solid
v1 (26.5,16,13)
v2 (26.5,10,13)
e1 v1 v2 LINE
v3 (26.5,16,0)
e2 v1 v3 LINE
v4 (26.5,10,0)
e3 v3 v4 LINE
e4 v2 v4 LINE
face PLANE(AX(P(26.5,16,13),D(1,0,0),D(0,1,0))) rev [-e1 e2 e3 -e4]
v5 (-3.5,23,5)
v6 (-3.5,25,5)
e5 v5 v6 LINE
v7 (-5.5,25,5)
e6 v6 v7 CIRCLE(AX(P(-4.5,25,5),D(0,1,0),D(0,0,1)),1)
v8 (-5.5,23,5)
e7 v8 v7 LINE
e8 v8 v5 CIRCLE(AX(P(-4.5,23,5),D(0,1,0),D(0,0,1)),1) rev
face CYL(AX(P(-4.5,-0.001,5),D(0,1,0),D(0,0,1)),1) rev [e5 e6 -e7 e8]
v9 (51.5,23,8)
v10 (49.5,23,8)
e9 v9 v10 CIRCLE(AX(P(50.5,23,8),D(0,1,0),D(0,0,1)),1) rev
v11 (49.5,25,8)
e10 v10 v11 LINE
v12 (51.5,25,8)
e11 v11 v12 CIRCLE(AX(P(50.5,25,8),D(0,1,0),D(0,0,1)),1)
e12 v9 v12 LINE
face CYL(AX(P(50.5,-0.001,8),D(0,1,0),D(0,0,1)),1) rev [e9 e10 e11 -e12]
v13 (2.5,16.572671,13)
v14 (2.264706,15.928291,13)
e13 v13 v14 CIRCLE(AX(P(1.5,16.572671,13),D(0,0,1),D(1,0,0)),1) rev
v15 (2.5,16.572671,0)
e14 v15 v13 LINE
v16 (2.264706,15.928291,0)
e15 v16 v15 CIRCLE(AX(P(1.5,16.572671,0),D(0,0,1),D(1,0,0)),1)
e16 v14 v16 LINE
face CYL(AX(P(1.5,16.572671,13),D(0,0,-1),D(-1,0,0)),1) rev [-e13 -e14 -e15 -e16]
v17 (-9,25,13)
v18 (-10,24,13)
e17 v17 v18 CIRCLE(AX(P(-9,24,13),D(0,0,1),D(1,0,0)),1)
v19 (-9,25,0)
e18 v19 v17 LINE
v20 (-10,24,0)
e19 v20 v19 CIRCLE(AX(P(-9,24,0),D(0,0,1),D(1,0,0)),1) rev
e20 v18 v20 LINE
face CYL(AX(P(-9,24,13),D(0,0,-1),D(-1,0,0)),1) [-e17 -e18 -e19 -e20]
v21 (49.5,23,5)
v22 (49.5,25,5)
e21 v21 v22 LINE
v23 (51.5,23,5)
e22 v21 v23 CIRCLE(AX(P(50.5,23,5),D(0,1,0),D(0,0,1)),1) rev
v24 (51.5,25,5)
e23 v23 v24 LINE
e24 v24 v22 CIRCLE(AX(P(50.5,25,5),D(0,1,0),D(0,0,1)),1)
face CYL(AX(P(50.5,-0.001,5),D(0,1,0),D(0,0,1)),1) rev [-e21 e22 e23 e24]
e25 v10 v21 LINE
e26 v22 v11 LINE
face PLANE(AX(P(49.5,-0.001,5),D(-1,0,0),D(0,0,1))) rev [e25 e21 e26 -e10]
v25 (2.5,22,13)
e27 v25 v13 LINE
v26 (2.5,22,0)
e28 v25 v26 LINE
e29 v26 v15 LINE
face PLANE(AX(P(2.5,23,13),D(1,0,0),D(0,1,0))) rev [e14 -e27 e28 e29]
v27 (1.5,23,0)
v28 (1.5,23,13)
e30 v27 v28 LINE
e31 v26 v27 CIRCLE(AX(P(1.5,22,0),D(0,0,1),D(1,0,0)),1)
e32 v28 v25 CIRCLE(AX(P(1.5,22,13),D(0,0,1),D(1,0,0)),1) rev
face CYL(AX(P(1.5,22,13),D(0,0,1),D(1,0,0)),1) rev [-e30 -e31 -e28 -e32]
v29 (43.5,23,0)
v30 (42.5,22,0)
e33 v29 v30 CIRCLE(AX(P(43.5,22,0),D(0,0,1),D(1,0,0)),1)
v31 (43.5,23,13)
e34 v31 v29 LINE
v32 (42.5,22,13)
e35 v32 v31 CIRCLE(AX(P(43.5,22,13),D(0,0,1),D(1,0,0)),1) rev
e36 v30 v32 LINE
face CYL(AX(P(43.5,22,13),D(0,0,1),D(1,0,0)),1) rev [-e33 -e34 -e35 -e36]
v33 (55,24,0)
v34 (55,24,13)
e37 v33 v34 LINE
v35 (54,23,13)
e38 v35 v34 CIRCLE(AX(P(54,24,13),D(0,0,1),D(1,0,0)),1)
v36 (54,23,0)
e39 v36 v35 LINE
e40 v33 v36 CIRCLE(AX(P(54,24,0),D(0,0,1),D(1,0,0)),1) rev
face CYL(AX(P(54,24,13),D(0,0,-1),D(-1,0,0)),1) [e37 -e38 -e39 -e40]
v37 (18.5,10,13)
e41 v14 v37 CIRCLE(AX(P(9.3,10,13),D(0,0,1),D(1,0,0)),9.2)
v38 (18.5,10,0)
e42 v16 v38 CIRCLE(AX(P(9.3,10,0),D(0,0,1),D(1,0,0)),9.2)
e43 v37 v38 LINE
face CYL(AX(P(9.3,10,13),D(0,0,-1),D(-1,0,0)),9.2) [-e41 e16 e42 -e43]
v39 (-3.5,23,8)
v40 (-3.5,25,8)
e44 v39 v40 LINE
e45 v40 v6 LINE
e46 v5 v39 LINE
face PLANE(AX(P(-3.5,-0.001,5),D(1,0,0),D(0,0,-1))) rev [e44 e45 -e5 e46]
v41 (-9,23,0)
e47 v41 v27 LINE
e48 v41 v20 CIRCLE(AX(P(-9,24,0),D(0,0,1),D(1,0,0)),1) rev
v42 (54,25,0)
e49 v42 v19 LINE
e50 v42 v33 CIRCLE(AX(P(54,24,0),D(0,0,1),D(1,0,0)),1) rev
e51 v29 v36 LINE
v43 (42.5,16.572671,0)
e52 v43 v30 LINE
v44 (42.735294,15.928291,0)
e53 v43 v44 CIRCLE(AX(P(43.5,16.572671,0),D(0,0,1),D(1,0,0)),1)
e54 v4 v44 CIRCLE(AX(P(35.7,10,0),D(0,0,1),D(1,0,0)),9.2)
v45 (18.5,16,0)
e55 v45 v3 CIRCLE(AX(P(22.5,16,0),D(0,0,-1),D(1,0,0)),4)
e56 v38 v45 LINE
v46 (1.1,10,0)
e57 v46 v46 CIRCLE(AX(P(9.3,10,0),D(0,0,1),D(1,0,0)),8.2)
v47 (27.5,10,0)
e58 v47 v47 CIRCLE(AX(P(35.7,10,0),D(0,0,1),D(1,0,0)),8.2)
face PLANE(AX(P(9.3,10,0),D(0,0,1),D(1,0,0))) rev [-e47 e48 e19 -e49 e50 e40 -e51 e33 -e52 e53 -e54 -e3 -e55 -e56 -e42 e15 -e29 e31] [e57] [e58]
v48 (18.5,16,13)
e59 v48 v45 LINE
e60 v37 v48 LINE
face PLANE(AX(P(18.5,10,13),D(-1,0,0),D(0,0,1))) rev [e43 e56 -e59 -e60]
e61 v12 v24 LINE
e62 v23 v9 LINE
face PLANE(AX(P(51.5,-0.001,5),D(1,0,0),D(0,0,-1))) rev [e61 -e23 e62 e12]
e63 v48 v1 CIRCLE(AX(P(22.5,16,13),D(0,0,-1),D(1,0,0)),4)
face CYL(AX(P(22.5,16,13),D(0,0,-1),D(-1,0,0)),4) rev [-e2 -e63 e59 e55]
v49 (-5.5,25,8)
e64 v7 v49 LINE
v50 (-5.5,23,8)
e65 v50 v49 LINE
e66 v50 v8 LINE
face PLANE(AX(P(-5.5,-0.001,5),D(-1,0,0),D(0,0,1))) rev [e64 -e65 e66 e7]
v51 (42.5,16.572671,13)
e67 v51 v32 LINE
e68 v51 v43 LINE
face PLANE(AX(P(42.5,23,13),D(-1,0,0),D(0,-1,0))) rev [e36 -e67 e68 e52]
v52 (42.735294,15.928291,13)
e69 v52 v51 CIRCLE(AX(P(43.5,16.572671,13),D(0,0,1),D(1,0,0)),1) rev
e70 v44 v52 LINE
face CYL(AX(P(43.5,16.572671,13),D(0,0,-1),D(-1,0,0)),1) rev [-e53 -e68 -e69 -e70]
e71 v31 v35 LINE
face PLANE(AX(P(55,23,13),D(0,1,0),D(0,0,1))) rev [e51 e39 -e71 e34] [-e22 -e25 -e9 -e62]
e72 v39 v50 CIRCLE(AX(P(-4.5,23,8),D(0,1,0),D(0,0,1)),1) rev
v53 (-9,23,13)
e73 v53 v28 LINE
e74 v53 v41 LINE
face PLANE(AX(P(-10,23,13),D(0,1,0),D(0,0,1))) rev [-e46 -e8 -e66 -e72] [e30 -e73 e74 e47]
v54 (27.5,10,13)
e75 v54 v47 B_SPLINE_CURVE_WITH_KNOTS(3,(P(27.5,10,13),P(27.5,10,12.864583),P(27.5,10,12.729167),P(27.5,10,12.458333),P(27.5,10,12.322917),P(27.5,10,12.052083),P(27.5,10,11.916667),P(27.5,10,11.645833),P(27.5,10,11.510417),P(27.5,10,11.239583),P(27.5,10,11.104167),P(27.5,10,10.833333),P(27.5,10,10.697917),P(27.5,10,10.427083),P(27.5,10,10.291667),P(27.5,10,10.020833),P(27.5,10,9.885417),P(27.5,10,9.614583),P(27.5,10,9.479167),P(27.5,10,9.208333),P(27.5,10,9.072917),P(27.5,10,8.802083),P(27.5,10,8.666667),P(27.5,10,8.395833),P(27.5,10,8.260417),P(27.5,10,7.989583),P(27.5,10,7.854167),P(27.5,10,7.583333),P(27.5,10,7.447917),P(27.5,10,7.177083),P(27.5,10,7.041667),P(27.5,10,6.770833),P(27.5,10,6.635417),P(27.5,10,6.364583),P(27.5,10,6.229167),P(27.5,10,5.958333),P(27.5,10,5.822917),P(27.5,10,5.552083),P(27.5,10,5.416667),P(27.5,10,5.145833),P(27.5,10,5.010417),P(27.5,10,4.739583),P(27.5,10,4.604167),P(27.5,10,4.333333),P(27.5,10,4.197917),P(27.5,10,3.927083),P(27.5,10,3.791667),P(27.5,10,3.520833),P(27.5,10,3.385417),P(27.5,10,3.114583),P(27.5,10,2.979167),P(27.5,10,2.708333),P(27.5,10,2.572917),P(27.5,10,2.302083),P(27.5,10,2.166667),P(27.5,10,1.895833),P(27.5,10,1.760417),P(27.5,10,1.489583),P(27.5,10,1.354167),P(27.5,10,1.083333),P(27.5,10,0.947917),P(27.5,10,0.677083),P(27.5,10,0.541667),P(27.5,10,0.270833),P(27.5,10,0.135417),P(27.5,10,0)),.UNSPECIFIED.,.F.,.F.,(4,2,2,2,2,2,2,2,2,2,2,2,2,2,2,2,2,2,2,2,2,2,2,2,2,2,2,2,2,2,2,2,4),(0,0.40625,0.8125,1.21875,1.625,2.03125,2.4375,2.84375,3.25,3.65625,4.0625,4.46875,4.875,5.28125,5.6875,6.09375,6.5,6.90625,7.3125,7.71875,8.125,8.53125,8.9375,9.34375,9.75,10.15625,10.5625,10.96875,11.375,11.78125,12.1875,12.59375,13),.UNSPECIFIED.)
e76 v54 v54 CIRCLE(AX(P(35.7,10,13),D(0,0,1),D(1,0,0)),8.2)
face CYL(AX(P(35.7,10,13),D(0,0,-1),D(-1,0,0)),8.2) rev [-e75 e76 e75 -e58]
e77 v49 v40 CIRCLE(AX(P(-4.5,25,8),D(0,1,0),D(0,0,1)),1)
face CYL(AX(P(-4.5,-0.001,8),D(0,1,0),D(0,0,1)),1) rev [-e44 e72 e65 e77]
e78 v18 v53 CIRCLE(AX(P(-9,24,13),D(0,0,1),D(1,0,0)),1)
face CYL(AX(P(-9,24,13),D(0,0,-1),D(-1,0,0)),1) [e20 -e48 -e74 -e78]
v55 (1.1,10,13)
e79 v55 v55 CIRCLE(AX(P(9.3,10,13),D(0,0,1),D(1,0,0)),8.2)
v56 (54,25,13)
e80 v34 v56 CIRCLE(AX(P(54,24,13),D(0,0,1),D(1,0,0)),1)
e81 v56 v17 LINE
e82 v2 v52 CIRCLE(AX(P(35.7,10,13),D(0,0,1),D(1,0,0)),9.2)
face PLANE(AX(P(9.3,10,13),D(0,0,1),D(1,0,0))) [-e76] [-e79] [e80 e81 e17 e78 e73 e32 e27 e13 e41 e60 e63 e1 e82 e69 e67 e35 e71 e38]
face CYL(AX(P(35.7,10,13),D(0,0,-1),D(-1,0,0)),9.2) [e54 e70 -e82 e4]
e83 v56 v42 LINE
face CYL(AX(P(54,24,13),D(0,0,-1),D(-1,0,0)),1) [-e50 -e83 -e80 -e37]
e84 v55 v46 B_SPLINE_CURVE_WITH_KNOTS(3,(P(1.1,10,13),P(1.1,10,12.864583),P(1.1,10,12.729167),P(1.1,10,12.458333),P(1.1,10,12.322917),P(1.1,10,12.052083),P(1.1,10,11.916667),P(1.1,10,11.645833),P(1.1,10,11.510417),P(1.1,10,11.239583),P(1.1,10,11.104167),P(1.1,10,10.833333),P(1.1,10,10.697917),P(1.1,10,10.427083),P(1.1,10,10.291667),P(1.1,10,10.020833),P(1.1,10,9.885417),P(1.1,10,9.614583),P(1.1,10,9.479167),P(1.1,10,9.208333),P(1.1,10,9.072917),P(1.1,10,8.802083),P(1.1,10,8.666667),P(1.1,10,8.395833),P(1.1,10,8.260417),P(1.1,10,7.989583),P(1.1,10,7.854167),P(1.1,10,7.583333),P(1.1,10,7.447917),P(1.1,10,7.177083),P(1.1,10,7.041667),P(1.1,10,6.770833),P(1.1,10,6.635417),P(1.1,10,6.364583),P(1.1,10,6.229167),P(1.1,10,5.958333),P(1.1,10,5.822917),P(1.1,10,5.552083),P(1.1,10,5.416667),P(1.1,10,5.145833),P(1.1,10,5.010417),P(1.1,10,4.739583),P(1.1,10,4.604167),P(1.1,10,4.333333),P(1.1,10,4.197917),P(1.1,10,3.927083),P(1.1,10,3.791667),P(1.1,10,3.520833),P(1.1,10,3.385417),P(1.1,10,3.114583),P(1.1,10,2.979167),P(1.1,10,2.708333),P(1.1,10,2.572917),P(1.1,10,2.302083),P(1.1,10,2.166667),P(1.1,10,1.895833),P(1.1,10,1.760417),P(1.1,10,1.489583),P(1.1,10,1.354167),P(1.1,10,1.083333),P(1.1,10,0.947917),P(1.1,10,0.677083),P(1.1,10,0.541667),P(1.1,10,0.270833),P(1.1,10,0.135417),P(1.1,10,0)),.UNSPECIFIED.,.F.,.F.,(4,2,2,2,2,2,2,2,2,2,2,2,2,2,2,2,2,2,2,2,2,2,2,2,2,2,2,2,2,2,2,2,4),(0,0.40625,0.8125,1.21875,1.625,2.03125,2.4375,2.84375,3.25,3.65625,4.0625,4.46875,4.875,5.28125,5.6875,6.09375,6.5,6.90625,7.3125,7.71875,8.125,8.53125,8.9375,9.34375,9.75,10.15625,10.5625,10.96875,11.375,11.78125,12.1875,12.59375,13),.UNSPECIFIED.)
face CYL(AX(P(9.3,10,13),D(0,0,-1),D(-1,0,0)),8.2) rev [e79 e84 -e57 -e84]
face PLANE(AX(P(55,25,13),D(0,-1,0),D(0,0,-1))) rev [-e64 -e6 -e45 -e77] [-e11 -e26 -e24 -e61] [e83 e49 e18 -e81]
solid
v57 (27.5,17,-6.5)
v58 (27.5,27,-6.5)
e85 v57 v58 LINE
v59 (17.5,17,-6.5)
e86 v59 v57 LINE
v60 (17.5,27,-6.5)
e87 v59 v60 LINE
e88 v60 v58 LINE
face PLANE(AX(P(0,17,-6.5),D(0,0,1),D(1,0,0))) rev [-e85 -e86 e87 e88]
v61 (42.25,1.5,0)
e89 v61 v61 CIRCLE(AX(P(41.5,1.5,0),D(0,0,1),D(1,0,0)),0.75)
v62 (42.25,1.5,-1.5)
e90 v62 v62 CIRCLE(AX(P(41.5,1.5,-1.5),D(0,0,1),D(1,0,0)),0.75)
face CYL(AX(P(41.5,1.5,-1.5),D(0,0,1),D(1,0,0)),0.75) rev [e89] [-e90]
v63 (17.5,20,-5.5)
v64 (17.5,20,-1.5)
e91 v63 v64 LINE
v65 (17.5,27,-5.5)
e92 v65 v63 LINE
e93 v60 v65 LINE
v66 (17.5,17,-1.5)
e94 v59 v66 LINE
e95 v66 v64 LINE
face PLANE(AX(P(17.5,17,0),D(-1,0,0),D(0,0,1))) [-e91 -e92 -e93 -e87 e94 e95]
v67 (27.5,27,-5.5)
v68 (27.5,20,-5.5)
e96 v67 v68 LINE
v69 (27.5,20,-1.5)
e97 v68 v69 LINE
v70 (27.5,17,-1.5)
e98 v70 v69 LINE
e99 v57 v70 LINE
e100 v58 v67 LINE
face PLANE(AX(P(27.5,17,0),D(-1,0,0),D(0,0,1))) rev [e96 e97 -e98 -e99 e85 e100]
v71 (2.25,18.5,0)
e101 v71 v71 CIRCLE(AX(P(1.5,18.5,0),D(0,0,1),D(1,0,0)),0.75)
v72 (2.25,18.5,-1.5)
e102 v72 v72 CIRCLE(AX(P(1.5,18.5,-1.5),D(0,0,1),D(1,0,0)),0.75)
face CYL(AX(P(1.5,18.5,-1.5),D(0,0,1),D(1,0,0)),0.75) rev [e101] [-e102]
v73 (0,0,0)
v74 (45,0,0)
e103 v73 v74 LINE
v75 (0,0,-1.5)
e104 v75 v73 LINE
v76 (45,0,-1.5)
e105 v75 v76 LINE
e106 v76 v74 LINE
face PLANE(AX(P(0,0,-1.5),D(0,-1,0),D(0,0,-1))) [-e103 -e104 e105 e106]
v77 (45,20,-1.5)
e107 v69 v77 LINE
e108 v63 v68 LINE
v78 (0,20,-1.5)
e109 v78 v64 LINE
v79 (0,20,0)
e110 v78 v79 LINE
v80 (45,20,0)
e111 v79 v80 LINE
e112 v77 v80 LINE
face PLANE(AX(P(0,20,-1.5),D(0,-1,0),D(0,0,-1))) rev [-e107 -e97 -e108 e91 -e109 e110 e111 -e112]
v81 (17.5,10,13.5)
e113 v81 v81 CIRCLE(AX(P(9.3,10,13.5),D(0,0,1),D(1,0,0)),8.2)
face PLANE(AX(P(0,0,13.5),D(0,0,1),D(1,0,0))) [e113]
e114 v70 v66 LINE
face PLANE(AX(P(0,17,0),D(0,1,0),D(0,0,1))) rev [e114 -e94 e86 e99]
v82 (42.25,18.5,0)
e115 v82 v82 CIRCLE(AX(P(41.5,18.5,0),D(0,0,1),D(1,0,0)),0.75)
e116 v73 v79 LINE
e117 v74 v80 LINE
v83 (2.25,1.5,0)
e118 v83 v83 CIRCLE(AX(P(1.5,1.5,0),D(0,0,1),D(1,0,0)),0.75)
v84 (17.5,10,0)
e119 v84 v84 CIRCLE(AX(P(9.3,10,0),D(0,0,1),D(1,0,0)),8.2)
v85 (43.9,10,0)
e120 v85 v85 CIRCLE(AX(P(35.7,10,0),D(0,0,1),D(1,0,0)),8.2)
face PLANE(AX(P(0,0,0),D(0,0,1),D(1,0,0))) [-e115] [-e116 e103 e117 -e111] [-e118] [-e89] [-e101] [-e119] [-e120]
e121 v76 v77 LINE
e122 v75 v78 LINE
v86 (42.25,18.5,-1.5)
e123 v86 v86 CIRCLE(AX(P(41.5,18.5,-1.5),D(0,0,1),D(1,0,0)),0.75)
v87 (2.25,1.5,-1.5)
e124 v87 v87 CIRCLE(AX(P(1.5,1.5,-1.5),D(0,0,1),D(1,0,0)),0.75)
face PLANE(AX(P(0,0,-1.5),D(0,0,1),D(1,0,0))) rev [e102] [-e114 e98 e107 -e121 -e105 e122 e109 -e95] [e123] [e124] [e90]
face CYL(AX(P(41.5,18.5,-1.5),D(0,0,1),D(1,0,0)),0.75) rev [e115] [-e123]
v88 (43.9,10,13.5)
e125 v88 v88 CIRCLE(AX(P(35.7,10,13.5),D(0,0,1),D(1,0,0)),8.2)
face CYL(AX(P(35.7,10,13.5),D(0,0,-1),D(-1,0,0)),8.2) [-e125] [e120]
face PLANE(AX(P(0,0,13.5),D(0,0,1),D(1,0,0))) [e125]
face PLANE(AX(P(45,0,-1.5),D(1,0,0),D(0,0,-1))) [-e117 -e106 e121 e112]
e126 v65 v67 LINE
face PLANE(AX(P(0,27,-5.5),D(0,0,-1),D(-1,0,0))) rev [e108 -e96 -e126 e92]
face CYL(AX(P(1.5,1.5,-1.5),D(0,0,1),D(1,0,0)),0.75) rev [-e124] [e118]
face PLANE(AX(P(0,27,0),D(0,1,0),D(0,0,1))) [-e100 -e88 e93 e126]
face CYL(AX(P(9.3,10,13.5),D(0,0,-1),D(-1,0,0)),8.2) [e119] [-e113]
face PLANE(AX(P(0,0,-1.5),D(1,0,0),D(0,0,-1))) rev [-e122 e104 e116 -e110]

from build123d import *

# Parameters (mm, degrees)
SKETCH1_W           = 45
SKETCH1_H           = 20
SKETCH1_R           = 0.75
BOSS_EXTRUDE1_DEPTH = 1.5
SKETCH1_3_R         = 8.2
BOSS_EXTRUDE2_DEPTH = 13.5
SKETCH2_W           = 5
SKETCH2_H           = 4
SKETCH2_H_2         = 1
BOSS_EXTRUDE3_DEPTH = 3
SKETCH2_3_W         = 5
SKETCH2_3_H         = 1
BOSS_EXTRUDE4_DEPTH = 7
SKETCH4_R           = 8.2
BOSS_EXTRUDE5_DEPTH = 13
CUT_EXTRUDE1_DEPTH  = 2
FILLET1_R           = 1


with BuildPart() as part:
    # Sketch1 → Boss-Extrude1 (new body)
    with BuildSketch(Plane.XY):
        with Locations((22.5, 10)):
            Rectangle(SKETCH1_W, SKETCH1_H)
        with Locations((1.5, 1.5)):
            Circle(SKETCH1_R, mode=Mode.SUBTRACT)
        with Locations((1.5, 18.5)):
            Circle(SKETCH1_R, mode=Mode.SUBTRACT)
        with Locations((41.5, 18.5)):
            Circle(SKETCH1_R, mode=Mode.SUBTRACT)
        with Locations((41.5, 1.5)):
            Circle(SKETCH1_R, mode=Mode.SUBTRACT)
    extrude(amount=-BOSS_EXTRUDE1_DEPTH)

    # Sketch1<3> → Boss-Extrude2 (add)
    with BuildSketch(Plane.XY):
        with Locations((9.3, 10)):
            Circle(SKETCH1_3_R)
        with Locations((35.7, 10)):
            Circle(SKETCH1_3_R)
    extrude(amount=BOSS_EXTRUDE2_DEPTH)

    # Sketch2 → Boss-Extrude3 (add)
    with BuildSketch(Plane(origin=(0, 20, 0), x_dir=(1, 0, 0), z_dir=(0, 1, 0))):
        with Locations((25, 3.5)):
            Rectangle(SKETCH2_W, SKETCH2_H)
        with Locations((20, 3.5)):
            Rectangle(SKETCH2_W, SKETCH2_H)
        with Locations((20, 6)):
            Rectangle(SKETCH2_W, SKETCH2_H_2)
        with Locations((25, 6)):
            Rectangle(SKETCH2_W, SKETCH2_H_2)
    extrude(amount=-BOSS_EXTRUDE3_DEPTH)

    # Sketch2<3> → Boss-Extrude4 (add)
    with BuildSketch(Plane(origin=(0, 20, 0), x_dir=(1, 0, 0), z_dir=(0, 1, 0))):
        with Locations((25, 6)):
            Rectangle(SKETCH2_3_W, SKETCH2_3_H)
        with Locations((20, 6)):
            Rectangle(SKETCH2_3_W, SKETCH2_3_H)
    extrude(amount=BOSS_EXTRUDE4_DEPTH)


with BuildPart() as body_2:
    # Sketch4 → Boss-Extrude5 (new body)
    with BuildSketch(Plane.XY):
        with BuildLine():
            Line((18.5, 10), (18.5, 16))
            ThreePointArc((18.5, 16), (22.5, 20), (26.5, 16))
            Line((26.5, 16), (26.5, 10))
            ThreePointArc((26.5, 10), (39.022649545, 1.420955764), (42.5, 16.196773354))
            Line((42.5, 16.196773354), (42.5, 23))
            Line((42.5, 23), (55, 23))
            Line((55, 23), (55, 25))
            Line((55, 25), (-10, 25))
            Line((-10, 25), (-10, 23))
            Line((-10, 23), (2.5, 23))
            Line((2.5, 23), (2.5, 16.196773354))
            ThreePointArc((2.5, 16.196773354), (5.977350455, 1.420955764), (18.5, 10))
        make_face()
        with Locations(Location((35.7, 10, 0), (0, 0, 180))):
            Circle(SKETCH4_R, mode=Mode.SUBTRACT)
        with Locations(Location((9.3, 10, 0), (0, 0, 180))):
            Circle(SKETCH4_R, mode=Mode.SUBTRACT)
    extrude(amount=BOSS_EXTRUDE5_DEPTH)

    # Sketch5 → Cut-Extrude1 (cut)
    with BuildSketch(Plane(origin=(0, 25, 0), x_dir=(1, 0, 0), z_dir=(0, 1, 0))):
        with BuildLine():
            Line((-3.5, -5), (-3.5, -8))
            ThreePointArc((-3.5, -8), (-4.5, -9), (-5.5, -8))
            Line((-5.5, -8), (-5.5, -5))
            ThreePointArc((-5.5, -5), (-4.5, -4), (-3.5, -5))
        make_face()
        with BuildLine():
            Line((51.5, -5), (51.5, -8))
            ThreePointArc((51.5, -8), (50.5, -9), (49.5, -8))
            Line((49.5, -8), (49.5, -5))
            ThreePointArc((49.5, -5), (50.5, -4), (51.5, -5))
        make_face()
    extrude(amount=-CUT_EXTRUDE1_DEPTH, mode=Mode.SUBTRACT)

    # Fillet1
    fillet1_edges = [body_2.edges().sort_by_distance(p)[0] for p in [
        (55, 25, 6.5),
        (-10, 25, 6.5),
        (42.5, 16.196773354, 6.5),
        (2.5, 16.196773354, 6.5),
        (42.5, 23, 6.5),
        (55, 23, 6.5),
        (2.5, 23, 6.5),
        (-10, 23, 6.5),
    ]]
    fillet(fillet1_edges, radius=FILLET1_R - 0.0001)  # a hair under: the kernel refuses the full size


solid = Compound([part.part, body_2.part])
